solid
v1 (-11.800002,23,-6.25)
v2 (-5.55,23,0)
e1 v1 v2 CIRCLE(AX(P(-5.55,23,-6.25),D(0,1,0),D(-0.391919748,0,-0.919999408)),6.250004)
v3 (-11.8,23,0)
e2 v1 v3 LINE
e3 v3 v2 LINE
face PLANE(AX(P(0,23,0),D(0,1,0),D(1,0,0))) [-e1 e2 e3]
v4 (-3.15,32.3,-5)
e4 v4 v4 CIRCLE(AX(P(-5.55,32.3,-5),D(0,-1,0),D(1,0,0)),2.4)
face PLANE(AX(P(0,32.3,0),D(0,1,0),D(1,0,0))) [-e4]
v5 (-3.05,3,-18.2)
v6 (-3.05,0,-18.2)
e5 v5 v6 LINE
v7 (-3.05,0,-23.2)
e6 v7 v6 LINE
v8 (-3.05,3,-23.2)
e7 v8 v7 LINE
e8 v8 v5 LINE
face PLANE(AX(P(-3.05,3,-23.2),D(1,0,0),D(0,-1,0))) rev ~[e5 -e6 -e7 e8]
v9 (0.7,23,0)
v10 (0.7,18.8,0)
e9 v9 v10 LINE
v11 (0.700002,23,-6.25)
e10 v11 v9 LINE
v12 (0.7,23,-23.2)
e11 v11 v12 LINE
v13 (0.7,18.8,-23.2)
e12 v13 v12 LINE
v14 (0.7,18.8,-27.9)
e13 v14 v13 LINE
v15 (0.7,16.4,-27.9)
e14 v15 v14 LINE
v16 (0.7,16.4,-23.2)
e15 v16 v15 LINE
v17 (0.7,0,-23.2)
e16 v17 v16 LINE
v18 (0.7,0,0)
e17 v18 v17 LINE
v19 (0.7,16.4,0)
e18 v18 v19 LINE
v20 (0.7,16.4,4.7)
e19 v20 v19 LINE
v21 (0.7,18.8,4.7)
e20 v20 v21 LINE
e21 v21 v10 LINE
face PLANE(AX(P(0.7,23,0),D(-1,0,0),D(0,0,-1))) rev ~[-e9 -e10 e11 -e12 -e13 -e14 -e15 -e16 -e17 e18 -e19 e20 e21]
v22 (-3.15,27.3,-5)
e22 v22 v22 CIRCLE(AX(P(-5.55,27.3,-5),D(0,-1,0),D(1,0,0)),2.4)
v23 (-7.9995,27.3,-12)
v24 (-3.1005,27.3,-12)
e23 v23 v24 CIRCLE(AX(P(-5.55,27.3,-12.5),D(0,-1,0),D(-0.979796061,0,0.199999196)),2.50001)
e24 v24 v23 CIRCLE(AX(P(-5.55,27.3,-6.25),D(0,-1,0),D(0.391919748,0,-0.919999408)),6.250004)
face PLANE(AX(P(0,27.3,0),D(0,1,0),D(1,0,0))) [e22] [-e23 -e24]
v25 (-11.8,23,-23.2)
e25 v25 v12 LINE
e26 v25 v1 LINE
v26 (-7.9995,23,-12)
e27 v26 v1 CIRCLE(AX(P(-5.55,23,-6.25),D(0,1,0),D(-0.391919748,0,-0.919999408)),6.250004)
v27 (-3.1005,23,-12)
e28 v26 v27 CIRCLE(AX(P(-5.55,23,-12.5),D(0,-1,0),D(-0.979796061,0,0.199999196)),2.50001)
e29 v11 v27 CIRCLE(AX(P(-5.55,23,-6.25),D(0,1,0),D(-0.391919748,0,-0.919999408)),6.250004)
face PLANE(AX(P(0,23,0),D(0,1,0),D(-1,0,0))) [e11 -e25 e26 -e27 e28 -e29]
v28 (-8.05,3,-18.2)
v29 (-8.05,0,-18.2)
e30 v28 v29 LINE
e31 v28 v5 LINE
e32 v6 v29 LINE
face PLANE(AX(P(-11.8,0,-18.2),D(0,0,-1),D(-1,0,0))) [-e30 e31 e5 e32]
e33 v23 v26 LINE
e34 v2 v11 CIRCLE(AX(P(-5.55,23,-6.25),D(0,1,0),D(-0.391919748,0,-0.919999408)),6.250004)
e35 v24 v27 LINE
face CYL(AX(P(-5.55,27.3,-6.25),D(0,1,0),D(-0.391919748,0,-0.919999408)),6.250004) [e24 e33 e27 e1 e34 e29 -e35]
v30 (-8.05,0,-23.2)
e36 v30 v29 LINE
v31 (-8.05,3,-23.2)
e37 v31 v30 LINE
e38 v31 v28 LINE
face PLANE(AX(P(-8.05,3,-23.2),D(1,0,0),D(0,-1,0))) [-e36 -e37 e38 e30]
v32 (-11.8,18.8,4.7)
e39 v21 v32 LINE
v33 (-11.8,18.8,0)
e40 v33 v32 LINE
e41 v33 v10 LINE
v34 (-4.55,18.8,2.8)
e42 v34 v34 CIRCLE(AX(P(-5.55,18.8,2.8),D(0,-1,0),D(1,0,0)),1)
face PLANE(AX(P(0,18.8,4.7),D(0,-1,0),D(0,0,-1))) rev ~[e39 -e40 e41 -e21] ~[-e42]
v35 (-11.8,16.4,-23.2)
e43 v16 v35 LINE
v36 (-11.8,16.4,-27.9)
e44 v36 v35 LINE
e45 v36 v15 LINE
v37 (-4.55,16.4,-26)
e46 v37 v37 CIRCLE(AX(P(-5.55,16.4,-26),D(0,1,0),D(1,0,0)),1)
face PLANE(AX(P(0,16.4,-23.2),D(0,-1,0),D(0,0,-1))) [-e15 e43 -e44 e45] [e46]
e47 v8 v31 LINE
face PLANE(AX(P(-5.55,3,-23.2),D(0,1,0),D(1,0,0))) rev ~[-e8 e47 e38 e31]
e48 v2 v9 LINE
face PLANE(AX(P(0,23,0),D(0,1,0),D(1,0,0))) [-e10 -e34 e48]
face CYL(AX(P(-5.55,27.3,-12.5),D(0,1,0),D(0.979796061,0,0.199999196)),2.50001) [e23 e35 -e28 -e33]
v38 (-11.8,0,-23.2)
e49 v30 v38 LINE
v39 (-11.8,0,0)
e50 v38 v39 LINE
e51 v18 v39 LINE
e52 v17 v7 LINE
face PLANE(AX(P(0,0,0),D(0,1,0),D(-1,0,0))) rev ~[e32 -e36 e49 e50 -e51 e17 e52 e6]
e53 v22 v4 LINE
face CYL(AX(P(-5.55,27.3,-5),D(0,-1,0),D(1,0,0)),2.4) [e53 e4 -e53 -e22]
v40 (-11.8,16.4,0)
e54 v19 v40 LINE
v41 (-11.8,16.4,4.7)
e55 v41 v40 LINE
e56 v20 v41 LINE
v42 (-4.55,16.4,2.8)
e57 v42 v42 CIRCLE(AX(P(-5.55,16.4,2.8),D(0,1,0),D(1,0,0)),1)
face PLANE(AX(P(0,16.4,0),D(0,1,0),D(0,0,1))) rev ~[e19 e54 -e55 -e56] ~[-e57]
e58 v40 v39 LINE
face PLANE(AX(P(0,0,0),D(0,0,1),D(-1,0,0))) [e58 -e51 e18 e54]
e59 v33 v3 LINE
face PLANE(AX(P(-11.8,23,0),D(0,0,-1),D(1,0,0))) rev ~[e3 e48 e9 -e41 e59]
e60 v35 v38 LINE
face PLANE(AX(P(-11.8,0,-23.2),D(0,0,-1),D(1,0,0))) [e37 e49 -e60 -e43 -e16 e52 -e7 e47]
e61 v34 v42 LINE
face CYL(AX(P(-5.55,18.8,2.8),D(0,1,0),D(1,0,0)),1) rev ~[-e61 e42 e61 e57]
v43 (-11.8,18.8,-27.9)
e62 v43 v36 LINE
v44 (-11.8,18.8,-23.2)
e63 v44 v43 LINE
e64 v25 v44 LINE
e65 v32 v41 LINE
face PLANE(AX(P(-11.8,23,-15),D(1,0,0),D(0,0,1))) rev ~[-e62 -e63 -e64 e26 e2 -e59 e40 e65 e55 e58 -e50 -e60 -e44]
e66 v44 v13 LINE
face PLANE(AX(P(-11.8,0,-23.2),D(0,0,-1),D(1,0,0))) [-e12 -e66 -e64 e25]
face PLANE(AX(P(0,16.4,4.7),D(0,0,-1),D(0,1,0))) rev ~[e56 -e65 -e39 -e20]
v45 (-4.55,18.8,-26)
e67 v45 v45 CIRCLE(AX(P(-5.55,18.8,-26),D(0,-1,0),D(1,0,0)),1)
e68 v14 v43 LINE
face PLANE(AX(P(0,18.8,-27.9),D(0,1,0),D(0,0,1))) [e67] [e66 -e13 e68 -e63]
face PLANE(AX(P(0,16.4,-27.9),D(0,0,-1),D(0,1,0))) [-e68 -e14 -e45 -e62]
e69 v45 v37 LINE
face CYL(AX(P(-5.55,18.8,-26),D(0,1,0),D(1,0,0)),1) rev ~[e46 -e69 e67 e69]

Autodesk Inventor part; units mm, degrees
ref_plane "YZ Plane" through (0, 0, 0) normal (1, 0, 0) x (0, 1, 0)
ref_plane "XZ Plane" through (0, 0, 0) normal (0, 1, 0) x (-1, 0, 0)
ref_plane "XY Plane" through (0, 0, 0) normal (0, 0, 1) x (1, 0, 0)
sketch "Boceto1" plane through (0, 0, 0) normal (0, 1, 0) x (-1, 0, 0)
  line L0 (0, 0) -> (11.8, 0)
  line L1 (11.8, 0) -> (11.8, -23.2)
  line L2 (11.8, -23.2) -> (0, -23.2)
  line L3 (0, -23.2) -> (0, 0)
  dimension "d0" = 11.8
  dimension "d1" = 23.2
extrude "Extrusión1" add sketch "Boceto1" along normal blind 23
sketch "Boceto2" plane through (0, 0, 0) normal (1, 0, 0) x (0, 0, -1)
  line L0 (0, 0) -> (0, 23) projected
  line L1 (0, 0) -> (0, 16.4)
  line L2 (0, 16.4) -> (-4.7, 16.4)
  line L3 (-4.7, 16.4) -> (-4.7, 18.8)
  line L4 (-4.7, 18.8) -> (0, 18.8)
  line L5 (23.2, 0) -> (23.2, 23) projected
  line L6 (23.2, 16.4) -> (27.9, 16.4)
  line L7 (27.9, 16.4) -> (27.9, 18.8)
  line L8 (27.9, 18.8) -> (23.2, 18.8)
  line L9 (0, 18.8) -> (0, 16.4)
  line L10 (23.2, 18.8) -> (23.2, 16.4)
  dimension "d4" = 16.4
  dimension "d5" = 4.7
  dimension "d6" = 2.4
  dimension "d7" = 4.7
extrude "Extrusión2" add sketch "Boceto2" against normal blind 11.8
move faces "Desplazar1" translate (0.7, 0, 0) faces at (0, 5.4667, -15.4667)
sketch "Boceto4" plane through (-11.8, 18.8, 4.7) normal (0, 1, 0) x (1, 0, 0)
  line L0 (12.5, 0) -> (12.5, 4.7) projected
  line L1 (0, 0) -> (12.5, 0)
  line L2 (12.5, 0) -> (0, 0) projected
  line L3 (6.25, 0) -> (6.25, 1.9)
  line L4 (0, 32.6) -> (0, 27.9) projected
  line L5 (12.5, 32.6) -> (0, 32.6) projected
  line L6 (0, 32.6) -> (12.5, 32.6)
  line L7 (6.25, 32.6) -> (6.25, 30.7)
  circle A0 centre (6.25, 1.9) radius 1
  circle A1 centre (6.25, 30.7) radius 1
  point P0 (11.8, 4.7)
  dimension "d13" = 1.9
  dimension "d14" = 1.9
  dimension "d15" = 2
  dimension "d16" = 2
extrude "Extrusión3" cut sketch "Boceto4" against normal blind 2.4
sketch "Boceto5" plane through (0, 23, 0) normal (0, 1, 0) x (1, 0, 0)
  line L0 (-11.8, 23.2) -> (-11.8, 0) projected
  line L1 (-11.8, 0) -> (0.7, 0) projected
  line L2 (-11.8, 0) -> (0.7, 0)
  line L3 (0.7, 0) -> (0.7, 15)
  line L4 (0.7, 0) -> (0.7, 23.2) projected
  line L5 (0.7, 15) -> (-11.8, 15)
  line L6 (-11.8, 15) -> (-11.8, 0)
  point P0 (0, 0)
  dimension "d19" = 15
extrude "Extrusión4" add sketch "Boceto5" along normal blind 4.3
sketch "Boceto6" plane through (0, 27.3, 0) normal (0, 1, 0) x (1, 0, 0)
  line L0 (-11.8, 0) -> (0.7, 0) projected
  line L1 (-5.55, 0) -> (-5.55, 5)
  circle A0 centre (-5.55, 5) radius 2.4
  point P0 (0, 0)
  dimension "d22" = 5
  dimension "d23" = 4.8
extrude "Extrusión5" add sketch "Boceto6" along normal blind 5
sketch "Boceto7" plane through (0, 27.3, 0) normal (0, 1, 0) x (1, 0, 0)
  line L0 (-11.8, 0) -> (0.7, 0) projected
  line L1 (-5.55, 0) -> (-5.55, 6.25)
  arc A0 (-7.9995, 12) -> (-3.1005, 12) centre (-5.55, 6.25) ccw
  line L2 (0.7, 15) -> (-11.8, 15) projected
  arc A1 (-3.1005, 12) -> (-7.9995, 12) centre (-5.55, 12.5) ccw
  line L3 (0.7, 0) -> (-11.8, 0)
  line L4 (-11.8, 15) -> (-11.8, 0) projected
  line L5 (-11.8, 0) -> (-11.8, 15)
  line L6 (-11.8, 15) -> (0.7, 15)
  line L7 (0.7, 23.2) -> (0.7, 0) projected
  line L8 (0.7, 0) -> (0.7, 15)
  point P0 (0, 0)
  dimension "d26" = 6.25
extrude "Extrusión6" cut sketch "Boceto7" against normal blind 4.3 contours L4 A0 L0 | A0 L7 L0 | L4 L2 A1 A0 | A0 A1 L2 L7
sketch "Boceto8" plane through (-11.8, 0, -23.2) normal (0, 0, -1) x (-1, 0, 0)
  line L0 (-12.5, 0) -> (0, 0) projected
  line L1 (-12.5, 0) -> (0, 0)
  line L2 (-6.25, 0) -> (-6.25, 3)
  line L3 (-6.25, 3) -> (-8.75, 3)
  line L4 (-8.75, 3) -> (-8.75, 0)
  line L5 (-6.25, 3) -> (-3.75, 3)
  line L6 (-3.75, 3) -> (-3.75, 0)
  point P0 (-11.8, 0)
  dimension "d30" = 3
  dimension "d31" = 2.5
  dimension "d32" = 2.5
extrude "Extrusión7" cut sketch "Boceto8" against normal blind 5
properties part number "microservo_FT"
